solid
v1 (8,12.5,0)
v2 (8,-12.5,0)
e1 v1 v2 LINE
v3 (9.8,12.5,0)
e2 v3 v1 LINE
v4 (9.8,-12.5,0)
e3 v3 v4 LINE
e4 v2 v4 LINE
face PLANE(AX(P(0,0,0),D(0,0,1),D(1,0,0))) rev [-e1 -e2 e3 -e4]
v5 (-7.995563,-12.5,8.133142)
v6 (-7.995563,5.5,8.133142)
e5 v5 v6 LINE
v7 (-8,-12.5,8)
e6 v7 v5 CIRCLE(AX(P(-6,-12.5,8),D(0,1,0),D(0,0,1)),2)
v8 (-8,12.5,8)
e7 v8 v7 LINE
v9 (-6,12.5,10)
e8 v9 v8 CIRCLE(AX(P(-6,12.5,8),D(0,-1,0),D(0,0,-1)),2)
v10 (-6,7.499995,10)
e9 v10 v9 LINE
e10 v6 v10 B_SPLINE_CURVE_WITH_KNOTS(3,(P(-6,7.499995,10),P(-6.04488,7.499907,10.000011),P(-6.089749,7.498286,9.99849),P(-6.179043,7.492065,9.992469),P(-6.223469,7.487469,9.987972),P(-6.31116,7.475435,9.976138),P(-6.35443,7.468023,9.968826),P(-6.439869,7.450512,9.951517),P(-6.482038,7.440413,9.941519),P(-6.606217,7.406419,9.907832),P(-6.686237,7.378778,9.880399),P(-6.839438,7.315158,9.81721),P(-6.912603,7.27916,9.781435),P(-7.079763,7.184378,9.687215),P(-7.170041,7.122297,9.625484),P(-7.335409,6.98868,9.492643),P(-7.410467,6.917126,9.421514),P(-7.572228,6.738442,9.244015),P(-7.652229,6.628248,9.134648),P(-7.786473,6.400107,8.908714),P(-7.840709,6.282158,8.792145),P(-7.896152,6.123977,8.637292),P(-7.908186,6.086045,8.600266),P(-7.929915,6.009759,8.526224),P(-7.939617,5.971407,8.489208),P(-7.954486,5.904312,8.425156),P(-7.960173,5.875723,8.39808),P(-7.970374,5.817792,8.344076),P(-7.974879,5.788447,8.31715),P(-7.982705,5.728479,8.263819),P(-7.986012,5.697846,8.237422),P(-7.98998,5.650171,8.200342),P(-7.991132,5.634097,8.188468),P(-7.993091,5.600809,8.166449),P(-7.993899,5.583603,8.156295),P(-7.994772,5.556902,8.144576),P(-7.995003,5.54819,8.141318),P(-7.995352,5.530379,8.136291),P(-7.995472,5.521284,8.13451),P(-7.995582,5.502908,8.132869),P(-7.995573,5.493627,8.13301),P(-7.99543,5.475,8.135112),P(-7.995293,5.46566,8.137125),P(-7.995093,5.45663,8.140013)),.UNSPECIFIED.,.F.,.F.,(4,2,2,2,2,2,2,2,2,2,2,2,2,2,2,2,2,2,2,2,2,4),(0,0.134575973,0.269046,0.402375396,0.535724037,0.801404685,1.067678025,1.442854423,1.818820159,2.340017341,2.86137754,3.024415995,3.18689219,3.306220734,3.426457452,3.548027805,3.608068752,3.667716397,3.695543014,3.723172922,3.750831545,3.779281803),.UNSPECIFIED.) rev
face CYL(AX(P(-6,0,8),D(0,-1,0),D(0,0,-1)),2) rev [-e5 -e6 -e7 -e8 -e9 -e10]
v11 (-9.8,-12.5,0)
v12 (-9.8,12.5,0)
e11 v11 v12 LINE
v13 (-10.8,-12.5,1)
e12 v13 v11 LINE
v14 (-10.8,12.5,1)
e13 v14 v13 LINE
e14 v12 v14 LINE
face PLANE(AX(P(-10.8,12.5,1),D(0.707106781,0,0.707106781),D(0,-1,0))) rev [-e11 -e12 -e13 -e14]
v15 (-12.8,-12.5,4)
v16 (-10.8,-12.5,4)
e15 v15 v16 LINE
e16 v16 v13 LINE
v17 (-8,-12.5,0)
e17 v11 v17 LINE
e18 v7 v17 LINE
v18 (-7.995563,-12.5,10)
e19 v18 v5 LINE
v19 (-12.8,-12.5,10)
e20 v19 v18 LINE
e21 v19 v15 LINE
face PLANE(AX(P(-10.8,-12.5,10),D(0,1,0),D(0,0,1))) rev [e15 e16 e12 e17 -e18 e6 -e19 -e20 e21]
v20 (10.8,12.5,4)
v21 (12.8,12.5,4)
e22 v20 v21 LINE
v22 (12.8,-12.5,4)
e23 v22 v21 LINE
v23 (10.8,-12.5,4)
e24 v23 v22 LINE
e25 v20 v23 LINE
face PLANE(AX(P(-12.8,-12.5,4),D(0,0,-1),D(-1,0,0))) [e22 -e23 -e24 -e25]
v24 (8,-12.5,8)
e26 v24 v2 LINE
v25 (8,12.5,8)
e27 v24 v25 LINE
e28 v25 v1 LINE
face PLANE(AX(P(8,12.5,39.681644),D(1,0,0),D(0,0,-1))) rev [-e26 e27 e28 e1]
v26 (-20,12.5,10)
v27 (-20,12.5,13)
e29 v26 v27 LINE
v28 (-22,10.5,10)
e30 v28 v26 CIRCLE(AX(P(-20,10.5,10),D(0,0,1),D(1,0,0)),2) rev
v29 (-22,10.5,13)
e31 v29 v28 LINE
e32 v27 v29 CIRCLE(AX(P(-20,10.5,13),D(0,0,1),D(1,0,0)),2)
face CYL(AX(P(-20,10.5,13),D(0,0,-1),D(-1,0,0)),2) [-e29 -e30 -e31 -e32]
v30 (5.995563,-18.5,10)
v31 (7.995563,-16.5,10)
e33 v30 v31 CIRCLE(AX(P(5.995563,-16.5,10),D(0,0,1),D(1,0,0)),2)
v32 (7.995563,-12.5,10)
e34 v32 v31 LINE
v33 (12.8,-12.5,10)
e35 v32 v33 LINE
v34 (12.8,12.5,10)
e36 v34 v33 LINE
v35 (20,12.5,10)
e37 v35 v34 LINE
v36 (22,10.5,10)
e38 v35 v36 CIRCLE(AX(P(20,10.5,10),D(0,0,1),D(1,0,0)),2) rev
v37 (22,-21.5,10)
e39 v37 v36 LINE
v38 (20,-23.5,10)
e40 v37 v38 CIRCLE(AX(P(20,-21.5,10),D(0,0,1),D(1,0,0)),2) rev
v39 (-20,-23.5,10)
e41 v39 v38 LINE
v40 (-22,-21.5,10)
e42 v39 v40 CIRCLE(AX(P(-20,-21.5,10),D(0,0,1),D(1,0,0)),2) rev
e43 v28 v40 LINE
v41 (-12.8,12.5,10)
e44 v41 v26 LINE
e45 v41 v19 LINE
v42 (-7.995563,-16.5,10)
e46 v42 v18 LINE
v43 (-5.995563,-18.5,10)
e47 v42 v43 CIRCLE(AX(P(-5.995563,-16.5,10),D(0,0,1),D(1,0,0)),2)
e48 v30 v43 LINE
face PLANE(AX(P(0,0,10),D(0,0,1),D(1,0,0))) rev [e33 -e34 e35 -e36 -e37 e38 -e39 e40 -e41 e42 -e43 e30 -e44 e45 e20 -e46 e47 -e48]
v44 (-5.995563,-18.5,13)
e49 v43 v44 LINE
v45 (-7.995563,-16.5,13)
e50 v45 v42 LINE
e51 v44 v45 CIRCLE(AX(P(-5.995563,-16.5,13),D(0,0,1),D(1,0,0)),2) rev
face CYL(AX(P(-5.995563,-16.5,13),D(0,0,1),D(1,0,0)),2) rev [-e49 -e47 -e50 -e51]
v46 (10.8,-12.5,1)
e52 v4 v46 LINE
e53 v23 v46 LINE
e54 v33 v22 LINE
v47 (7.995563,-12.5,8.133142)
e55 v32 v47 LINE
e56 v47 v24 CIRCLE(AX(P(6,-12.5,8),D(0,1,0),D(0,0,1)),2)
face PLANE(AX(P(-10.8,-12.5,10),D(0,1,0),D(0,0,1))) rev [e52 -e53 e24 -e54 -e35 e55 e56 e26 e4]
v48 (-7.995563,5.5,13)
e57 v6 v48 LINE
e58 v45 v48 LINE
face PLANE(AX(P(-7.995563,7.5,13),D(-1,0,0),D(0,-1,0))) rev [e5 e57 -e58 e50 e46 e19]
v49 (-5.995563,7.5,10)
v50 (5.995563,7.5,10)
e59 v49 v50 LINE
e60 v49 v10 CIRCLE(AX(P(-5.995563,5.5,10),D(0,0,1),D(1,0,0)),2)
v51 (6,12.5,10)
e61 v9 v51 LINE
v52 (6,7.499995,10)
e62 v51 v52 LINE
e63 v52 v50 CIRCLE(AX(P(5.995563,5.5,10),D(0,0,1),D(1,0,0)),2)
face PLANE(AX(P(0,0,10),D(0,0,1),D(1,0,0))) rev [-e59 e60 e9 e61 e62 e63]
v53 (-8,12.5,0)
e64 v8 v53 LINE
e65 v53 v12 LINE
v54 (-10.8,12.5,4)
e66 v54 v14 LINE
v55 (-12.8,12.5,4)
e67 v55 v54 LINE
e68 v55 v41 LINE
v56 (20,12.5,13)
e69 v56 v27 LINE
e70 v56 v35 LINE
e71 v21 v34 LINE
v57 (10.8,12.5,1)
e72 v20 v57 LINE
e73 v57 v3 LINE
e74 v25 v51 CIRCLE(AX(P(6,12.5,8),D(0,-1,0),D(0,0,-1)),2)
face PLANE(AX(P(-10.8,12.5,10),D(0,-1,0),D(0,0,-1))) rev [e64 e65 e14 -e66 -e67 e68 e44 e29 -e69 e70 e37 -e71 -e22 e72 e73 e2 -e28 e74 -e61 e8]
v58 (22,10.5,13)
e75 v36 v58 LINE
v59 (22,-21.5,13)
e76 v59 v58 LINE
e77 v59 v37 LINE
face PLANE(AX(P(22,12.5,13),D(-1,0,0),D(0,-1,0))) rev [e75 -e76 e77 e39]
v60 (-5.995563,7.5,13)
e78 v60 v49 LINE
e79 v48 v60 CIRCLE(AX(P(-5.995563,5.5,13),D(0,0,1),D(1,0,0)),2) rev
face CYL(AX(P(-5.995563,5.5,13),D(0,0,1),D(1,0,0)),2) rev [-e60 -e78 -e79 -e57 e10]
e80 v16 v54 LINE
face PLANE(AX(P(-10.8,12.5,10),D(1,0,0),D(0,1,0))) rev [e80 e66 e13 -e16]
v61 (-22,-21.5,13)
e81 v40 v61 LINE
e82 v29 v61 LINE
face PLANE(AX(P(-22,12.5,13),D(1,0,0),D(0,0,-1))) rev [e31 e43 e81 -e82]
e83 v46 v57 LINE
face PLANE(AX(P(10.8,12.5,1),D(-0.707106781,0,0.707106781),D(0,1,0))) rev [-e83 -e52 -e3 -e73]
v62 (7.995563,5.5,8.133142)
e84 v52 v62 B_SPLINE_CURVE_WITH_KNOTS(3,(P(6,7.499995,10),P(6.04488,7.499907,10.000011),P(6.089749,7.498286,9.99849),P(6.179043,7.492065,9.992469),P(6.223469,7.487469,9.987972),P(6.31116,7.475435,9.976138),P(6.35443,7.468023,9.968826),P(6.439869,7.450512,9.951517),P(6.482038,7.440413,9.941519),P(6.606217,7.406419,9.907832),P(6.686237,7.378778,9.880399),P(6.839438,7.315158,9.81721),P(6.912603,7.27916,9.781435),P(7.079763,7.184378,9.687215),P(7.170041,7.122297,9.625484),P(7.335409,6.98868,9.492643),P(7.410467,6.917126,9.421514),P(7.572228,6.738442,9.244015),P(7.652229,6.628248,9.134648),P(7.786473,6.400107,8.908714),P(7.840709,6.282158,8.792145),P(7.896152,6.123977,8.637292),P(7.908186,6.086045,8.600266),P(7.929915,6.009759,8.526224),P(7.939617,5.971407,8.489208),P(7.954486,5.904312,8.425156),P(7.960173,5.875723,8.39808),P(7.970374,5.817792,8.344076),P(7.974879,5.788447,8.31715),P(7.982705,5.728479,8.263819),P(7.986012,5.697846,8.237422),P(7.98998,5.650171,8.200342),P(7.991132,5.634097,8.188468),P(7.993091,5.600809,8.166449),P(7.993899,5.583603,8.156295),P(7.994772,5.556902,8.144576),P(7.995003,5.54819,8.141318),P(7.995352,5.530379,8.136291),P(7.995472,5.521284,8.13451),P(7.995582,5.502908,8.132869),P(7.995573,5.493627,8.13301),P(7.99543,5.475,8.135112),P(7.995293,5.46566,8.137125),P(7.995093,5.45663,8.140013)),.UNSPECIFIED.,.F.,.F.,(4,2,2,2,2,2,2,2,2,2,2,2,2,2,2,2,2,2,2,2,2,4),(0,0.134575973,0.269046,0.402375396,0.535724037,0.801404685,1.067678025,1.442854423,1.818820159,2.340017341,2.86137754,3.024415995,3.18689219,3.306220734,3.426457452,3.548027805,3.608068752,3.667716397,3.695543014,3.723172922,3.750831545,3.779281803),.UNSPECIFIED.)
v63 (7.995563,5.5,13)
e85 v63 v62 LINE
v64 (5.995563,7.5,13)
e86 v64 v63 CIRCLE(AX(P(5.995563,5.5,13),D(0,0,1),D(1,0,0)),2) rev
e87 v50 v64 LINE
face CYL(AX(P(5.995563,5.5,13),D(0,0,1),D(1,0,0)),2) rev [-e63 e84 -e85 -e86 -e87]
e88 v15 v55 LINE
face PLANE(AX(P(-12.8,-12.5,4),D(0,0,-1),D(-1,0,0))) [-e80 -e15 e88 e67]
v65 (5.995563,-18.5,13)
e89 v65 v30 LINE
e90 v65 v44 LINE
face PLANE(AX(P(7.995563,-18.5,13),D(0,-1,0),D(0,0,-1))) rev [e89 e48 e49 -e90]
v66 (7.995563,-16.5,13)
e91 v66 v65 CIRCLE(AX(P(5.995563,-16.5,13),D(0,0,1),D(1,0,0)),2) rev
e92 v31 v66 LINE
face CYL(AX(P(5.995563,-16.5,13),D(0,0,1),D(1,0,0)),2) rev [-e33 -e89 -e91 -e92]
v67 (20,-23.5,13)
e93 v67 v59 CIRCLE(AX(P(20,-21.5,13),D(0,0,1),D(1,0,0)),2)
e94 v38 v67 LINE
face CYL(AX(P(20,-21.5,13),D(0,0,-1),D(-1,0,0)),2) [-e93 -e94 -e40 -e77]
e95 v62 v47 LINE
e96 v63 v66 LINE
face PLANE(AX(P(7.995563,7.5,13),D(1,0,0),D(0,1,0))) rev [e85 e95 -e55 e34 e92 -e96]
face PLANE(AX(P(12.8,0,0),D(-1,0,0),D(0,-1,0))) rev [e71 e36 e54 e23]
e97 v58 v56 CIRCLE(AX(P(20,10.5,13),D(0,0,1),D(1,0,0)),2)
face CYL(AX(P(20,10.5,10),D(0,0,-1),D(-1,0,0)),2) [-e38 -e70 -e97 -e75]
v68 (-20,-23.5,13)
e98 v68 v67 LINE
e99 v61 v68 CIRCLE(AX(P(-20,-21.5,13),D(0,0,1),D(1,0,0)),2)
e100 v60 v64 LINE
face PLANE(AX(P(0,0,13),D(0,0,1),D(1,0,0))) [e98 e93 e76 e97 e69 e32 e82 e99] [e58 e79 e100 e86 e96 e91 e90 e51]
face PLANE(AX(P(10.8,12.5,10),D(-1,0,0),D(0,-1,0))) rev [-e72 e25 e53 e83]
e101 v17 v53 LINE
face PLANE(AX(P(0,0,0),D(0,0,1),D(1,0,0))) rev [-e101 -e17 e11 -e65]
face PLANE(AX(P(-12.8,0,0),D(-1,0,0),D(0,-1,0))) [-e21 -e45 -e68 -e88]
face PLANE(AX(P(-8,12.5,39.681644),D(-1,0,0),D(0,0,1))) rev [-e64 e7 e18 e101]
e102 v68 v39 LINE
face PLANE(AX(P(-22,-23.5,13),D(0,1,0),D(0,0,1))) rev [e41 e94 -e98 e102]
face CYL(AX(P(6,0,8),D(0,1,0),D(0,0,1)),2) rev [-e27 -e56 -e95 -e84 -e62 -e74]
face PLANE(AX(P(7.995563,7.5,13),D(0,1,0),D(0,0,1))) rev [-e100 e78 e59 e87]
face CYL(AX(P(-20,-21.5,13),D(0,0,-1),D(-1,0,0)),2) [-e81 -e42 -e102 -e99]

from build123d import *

# Parameters (mm, degrees)
SKETCH_1_W           = 21.6
SKETCH_1_H           = 25
EXTRUDE_1_DEPTH      = 10
SKETCH_2_W           = 44
SKETCH_2_H           = 36
EXTRUDE_2_DEPTH      = 3
EXTRUDE_3_DEPTH      = 2
EXTRUDE_3_DEPTH_BACK = 23.6
SKETCH_3_W           = 6
SKETCH_3_H           = 25
CHAMFER_1_SIZE       = 1
SKETCH_4_W           = 16
SKETCH_4_H           = 25
CUT_EXTRUDE_1_DEPTH  = 10
FILLET_1_R           = 2
SKETCH_5_W           = 15.991126726
SKETCH_5_H           = 26
CUT_EXTRUDE_2_DEPTH  = 34.708307581
FILLET_2_R           = 2
FILLET_START         = 5.4999999
FILLET_3_DEPTH       = 7.0000001
FILLET_START_2       = -12.5
FILLET_3_2_DEPTH     = 18.304364073
FILLET_START_3       = 8
FILLET_3_3_DEPTH     = 2


with BuildPart() as part:
    # ｽｹｯﾁ1 → ﾎﾞｽ - 押し出し1 (new body)
    with BuildSketch(Plane.XY):
        Rectangle(SKETCH_1_W, SKETCH_1_H)
    extrude(amount=EXTRUDE_1_DEPTH)

    # ｽｹｯﾁ2 → ﾎﾞｽ - 押し出し2 (add)
    with BuildSketch(Plane.XY.offset(10)):
        with Locations((0, -5.5)):
            Rectangle(SKETCH_2_W, SKETCH_2_H)
    extrude(amount=EXTRUDE_2_DEPTH)

    # ｽｹｯﾁ3 → ﾎﾞｽ - 押し出し3 (add, two sides: drawn at the far end of the back side and taken through both)
    with BuildSketch(Plane(origin=(10.8, 0, 0), x_dir=(0, 0, -1), z_dir=(1, 0, 0)).offset(-EXTRUDE_3_DEPTH_BACK)):
        with Locations((-7, 0)):
            Rectangle(SKETCH_3_W, SKETCH_3_H)
    extrude(amount=EXTRUDE_3_DEPTH + EXTRUDE_3_DEPTH_BACK)

    # 面取り1
    chamfer_1_edges = [part.edges().sort_by_distance(p)[0] for p in [
        (-10.8, 0, 0),
        (10.8, 0, 0),
    ]]
    chamfer(chamfer_1_edges, length=CHAMFER_1_SIZE)

    # ｽｹｯﾁ4 → ｶｯﾄ - 押し出し1 (cut)
    with BuildSketch(Plane(origin=(0, 0, 0), x_dir=(-1, 0, 0), z_dir=(0, 0, -1))):
        Rectangle(SKETCH_4_W, SKETCH_4_H)
    extrude(amount=-CUT_EXTRUDE_1_DEPTH, mode=Mode.SUBTRACT)

    # ﾌｨﾚｯﾄ1
    fillet_1_edges = [part.edges().sort_by_distance(p)[0] for p in [
        (22, -23.5, 11.5),
        (22, 12.5, 11.5),
        (-22, 12.5, 11.5),
        (-22, -23.5, 11.5),
    ]]
    fillet(fillet_1_edges, radius=FILLET_1_R)

    # ｽｹｯﾁ5 → ｶｯﾄ - 押し出し2 (cut, through all)
    with BuildSketch(Plane(origin=(0, 0, 10), x_dir=(-1, 0, 0), z_dir=(0, 0, -1))):
        with Locations((0, -5.5)):
            Rectangle(SKETCH_5_W, SKETCH_5_H)
    extrude(amount=-CUT_EXTRUDE_2_DEPTH, mode=Mode.SUBTRACT)

    # ﾌｨﾚｯﾄ2
    fillet_2_edges = [part.edges().sort_by_distance(p)[0] for p in [
        (-7.995563363, 7.5, 11.5),
        (-7.995563363, -18.5, 11.5),
        (7.995563363, -18.5, 11.5),
        (7.995563363, 7.5, 11.5),
    ]]
    fillet(fillet_2_edges, radius=FILLET_2_R)

    # ﾌｨﾚｯﾄ3: read off the stored shape, not the designer's step
    # ﾌｨﾚｯﾄ3 outline → ﾌｨﾚｯﾄ3 (add)
    with BuildSketch(Plane(origin=(0, 0, 0), x_dir=(1, 0, 0), z_dir=(0, 1, 0)).offset(FILLET_START)):
        with BuildLine():
            ThreePointArc((-6, -10), (-7.414213562, -9.414213562), (-8, -8))
            Line((-8, -8), (-8, -10))
            Line((-8, -10), (-6, -10))
        make_face()
        with BuildLine():
            Line((6, -10), (8, -10))
            Line((8, -10), (8, -8))
            ThreePointArc((8, -8), (7.414213562, -9.414213562), (6, -10))
        make_face()
    extrude(amount=FILLET_3_DEPTH)

    # Fillet 3 2 outline → Fillet 3 2 (add)
    with BuildSketch(Plane(origin=(0, 0, 0), x_dir=(1, 0, 0), z_dir=(0, 1, 0)).offset(FILLET_START_2)):
        with BuildLine():
            Line((-7.995563363, -10), (-7.995563363, -8.133142264))
            ThreePointArc((-7.995563363, -8.133142264), (-7.998890533, -8.066608082), (-8, -8))
            Line((-8, -8), (-8, -10))
            Line((-8, -10), (-7.995563363, -10))
        make_face()
        with BuildLine():
            ThreePointArc((8, -8), (7.998890533, -8.066608082), (7.995563363, -8.133142264))
            Line((7.995563363, -8.133142264), (7.995563363, -10))
            Line((7.995563363, -10), (8, -10))
            Line((8, -10), (8, -8))
        make_face()
    extrude(amount=FILLET_3_2_DEPTH)

    # Fillet 3 3 outline → Fillet 3 3 (cut)
    with BuildSketch(Plane.XY.offset(FILLET_START_3)):
        with BuildLine():
            Line((5.995563363, 7.5), (-5.995563363, 7.5))
            ThreePointArc((-5.995563363, 7.5), (-7.409776925, 6.914213563), (-7.995563363, 5.5))
            Line((-7.995563363, 5.5), (7.995563363, 5.5))
            ThreePointArc((7.995563363, 5.5), (7.409776925, 6.914213563), (5.995563363, 7.5))
        make_face()
    extrude(amount=FILLET_3_3_DEPTH, mode=Mode.SUBTRACT)


solid = part.part
